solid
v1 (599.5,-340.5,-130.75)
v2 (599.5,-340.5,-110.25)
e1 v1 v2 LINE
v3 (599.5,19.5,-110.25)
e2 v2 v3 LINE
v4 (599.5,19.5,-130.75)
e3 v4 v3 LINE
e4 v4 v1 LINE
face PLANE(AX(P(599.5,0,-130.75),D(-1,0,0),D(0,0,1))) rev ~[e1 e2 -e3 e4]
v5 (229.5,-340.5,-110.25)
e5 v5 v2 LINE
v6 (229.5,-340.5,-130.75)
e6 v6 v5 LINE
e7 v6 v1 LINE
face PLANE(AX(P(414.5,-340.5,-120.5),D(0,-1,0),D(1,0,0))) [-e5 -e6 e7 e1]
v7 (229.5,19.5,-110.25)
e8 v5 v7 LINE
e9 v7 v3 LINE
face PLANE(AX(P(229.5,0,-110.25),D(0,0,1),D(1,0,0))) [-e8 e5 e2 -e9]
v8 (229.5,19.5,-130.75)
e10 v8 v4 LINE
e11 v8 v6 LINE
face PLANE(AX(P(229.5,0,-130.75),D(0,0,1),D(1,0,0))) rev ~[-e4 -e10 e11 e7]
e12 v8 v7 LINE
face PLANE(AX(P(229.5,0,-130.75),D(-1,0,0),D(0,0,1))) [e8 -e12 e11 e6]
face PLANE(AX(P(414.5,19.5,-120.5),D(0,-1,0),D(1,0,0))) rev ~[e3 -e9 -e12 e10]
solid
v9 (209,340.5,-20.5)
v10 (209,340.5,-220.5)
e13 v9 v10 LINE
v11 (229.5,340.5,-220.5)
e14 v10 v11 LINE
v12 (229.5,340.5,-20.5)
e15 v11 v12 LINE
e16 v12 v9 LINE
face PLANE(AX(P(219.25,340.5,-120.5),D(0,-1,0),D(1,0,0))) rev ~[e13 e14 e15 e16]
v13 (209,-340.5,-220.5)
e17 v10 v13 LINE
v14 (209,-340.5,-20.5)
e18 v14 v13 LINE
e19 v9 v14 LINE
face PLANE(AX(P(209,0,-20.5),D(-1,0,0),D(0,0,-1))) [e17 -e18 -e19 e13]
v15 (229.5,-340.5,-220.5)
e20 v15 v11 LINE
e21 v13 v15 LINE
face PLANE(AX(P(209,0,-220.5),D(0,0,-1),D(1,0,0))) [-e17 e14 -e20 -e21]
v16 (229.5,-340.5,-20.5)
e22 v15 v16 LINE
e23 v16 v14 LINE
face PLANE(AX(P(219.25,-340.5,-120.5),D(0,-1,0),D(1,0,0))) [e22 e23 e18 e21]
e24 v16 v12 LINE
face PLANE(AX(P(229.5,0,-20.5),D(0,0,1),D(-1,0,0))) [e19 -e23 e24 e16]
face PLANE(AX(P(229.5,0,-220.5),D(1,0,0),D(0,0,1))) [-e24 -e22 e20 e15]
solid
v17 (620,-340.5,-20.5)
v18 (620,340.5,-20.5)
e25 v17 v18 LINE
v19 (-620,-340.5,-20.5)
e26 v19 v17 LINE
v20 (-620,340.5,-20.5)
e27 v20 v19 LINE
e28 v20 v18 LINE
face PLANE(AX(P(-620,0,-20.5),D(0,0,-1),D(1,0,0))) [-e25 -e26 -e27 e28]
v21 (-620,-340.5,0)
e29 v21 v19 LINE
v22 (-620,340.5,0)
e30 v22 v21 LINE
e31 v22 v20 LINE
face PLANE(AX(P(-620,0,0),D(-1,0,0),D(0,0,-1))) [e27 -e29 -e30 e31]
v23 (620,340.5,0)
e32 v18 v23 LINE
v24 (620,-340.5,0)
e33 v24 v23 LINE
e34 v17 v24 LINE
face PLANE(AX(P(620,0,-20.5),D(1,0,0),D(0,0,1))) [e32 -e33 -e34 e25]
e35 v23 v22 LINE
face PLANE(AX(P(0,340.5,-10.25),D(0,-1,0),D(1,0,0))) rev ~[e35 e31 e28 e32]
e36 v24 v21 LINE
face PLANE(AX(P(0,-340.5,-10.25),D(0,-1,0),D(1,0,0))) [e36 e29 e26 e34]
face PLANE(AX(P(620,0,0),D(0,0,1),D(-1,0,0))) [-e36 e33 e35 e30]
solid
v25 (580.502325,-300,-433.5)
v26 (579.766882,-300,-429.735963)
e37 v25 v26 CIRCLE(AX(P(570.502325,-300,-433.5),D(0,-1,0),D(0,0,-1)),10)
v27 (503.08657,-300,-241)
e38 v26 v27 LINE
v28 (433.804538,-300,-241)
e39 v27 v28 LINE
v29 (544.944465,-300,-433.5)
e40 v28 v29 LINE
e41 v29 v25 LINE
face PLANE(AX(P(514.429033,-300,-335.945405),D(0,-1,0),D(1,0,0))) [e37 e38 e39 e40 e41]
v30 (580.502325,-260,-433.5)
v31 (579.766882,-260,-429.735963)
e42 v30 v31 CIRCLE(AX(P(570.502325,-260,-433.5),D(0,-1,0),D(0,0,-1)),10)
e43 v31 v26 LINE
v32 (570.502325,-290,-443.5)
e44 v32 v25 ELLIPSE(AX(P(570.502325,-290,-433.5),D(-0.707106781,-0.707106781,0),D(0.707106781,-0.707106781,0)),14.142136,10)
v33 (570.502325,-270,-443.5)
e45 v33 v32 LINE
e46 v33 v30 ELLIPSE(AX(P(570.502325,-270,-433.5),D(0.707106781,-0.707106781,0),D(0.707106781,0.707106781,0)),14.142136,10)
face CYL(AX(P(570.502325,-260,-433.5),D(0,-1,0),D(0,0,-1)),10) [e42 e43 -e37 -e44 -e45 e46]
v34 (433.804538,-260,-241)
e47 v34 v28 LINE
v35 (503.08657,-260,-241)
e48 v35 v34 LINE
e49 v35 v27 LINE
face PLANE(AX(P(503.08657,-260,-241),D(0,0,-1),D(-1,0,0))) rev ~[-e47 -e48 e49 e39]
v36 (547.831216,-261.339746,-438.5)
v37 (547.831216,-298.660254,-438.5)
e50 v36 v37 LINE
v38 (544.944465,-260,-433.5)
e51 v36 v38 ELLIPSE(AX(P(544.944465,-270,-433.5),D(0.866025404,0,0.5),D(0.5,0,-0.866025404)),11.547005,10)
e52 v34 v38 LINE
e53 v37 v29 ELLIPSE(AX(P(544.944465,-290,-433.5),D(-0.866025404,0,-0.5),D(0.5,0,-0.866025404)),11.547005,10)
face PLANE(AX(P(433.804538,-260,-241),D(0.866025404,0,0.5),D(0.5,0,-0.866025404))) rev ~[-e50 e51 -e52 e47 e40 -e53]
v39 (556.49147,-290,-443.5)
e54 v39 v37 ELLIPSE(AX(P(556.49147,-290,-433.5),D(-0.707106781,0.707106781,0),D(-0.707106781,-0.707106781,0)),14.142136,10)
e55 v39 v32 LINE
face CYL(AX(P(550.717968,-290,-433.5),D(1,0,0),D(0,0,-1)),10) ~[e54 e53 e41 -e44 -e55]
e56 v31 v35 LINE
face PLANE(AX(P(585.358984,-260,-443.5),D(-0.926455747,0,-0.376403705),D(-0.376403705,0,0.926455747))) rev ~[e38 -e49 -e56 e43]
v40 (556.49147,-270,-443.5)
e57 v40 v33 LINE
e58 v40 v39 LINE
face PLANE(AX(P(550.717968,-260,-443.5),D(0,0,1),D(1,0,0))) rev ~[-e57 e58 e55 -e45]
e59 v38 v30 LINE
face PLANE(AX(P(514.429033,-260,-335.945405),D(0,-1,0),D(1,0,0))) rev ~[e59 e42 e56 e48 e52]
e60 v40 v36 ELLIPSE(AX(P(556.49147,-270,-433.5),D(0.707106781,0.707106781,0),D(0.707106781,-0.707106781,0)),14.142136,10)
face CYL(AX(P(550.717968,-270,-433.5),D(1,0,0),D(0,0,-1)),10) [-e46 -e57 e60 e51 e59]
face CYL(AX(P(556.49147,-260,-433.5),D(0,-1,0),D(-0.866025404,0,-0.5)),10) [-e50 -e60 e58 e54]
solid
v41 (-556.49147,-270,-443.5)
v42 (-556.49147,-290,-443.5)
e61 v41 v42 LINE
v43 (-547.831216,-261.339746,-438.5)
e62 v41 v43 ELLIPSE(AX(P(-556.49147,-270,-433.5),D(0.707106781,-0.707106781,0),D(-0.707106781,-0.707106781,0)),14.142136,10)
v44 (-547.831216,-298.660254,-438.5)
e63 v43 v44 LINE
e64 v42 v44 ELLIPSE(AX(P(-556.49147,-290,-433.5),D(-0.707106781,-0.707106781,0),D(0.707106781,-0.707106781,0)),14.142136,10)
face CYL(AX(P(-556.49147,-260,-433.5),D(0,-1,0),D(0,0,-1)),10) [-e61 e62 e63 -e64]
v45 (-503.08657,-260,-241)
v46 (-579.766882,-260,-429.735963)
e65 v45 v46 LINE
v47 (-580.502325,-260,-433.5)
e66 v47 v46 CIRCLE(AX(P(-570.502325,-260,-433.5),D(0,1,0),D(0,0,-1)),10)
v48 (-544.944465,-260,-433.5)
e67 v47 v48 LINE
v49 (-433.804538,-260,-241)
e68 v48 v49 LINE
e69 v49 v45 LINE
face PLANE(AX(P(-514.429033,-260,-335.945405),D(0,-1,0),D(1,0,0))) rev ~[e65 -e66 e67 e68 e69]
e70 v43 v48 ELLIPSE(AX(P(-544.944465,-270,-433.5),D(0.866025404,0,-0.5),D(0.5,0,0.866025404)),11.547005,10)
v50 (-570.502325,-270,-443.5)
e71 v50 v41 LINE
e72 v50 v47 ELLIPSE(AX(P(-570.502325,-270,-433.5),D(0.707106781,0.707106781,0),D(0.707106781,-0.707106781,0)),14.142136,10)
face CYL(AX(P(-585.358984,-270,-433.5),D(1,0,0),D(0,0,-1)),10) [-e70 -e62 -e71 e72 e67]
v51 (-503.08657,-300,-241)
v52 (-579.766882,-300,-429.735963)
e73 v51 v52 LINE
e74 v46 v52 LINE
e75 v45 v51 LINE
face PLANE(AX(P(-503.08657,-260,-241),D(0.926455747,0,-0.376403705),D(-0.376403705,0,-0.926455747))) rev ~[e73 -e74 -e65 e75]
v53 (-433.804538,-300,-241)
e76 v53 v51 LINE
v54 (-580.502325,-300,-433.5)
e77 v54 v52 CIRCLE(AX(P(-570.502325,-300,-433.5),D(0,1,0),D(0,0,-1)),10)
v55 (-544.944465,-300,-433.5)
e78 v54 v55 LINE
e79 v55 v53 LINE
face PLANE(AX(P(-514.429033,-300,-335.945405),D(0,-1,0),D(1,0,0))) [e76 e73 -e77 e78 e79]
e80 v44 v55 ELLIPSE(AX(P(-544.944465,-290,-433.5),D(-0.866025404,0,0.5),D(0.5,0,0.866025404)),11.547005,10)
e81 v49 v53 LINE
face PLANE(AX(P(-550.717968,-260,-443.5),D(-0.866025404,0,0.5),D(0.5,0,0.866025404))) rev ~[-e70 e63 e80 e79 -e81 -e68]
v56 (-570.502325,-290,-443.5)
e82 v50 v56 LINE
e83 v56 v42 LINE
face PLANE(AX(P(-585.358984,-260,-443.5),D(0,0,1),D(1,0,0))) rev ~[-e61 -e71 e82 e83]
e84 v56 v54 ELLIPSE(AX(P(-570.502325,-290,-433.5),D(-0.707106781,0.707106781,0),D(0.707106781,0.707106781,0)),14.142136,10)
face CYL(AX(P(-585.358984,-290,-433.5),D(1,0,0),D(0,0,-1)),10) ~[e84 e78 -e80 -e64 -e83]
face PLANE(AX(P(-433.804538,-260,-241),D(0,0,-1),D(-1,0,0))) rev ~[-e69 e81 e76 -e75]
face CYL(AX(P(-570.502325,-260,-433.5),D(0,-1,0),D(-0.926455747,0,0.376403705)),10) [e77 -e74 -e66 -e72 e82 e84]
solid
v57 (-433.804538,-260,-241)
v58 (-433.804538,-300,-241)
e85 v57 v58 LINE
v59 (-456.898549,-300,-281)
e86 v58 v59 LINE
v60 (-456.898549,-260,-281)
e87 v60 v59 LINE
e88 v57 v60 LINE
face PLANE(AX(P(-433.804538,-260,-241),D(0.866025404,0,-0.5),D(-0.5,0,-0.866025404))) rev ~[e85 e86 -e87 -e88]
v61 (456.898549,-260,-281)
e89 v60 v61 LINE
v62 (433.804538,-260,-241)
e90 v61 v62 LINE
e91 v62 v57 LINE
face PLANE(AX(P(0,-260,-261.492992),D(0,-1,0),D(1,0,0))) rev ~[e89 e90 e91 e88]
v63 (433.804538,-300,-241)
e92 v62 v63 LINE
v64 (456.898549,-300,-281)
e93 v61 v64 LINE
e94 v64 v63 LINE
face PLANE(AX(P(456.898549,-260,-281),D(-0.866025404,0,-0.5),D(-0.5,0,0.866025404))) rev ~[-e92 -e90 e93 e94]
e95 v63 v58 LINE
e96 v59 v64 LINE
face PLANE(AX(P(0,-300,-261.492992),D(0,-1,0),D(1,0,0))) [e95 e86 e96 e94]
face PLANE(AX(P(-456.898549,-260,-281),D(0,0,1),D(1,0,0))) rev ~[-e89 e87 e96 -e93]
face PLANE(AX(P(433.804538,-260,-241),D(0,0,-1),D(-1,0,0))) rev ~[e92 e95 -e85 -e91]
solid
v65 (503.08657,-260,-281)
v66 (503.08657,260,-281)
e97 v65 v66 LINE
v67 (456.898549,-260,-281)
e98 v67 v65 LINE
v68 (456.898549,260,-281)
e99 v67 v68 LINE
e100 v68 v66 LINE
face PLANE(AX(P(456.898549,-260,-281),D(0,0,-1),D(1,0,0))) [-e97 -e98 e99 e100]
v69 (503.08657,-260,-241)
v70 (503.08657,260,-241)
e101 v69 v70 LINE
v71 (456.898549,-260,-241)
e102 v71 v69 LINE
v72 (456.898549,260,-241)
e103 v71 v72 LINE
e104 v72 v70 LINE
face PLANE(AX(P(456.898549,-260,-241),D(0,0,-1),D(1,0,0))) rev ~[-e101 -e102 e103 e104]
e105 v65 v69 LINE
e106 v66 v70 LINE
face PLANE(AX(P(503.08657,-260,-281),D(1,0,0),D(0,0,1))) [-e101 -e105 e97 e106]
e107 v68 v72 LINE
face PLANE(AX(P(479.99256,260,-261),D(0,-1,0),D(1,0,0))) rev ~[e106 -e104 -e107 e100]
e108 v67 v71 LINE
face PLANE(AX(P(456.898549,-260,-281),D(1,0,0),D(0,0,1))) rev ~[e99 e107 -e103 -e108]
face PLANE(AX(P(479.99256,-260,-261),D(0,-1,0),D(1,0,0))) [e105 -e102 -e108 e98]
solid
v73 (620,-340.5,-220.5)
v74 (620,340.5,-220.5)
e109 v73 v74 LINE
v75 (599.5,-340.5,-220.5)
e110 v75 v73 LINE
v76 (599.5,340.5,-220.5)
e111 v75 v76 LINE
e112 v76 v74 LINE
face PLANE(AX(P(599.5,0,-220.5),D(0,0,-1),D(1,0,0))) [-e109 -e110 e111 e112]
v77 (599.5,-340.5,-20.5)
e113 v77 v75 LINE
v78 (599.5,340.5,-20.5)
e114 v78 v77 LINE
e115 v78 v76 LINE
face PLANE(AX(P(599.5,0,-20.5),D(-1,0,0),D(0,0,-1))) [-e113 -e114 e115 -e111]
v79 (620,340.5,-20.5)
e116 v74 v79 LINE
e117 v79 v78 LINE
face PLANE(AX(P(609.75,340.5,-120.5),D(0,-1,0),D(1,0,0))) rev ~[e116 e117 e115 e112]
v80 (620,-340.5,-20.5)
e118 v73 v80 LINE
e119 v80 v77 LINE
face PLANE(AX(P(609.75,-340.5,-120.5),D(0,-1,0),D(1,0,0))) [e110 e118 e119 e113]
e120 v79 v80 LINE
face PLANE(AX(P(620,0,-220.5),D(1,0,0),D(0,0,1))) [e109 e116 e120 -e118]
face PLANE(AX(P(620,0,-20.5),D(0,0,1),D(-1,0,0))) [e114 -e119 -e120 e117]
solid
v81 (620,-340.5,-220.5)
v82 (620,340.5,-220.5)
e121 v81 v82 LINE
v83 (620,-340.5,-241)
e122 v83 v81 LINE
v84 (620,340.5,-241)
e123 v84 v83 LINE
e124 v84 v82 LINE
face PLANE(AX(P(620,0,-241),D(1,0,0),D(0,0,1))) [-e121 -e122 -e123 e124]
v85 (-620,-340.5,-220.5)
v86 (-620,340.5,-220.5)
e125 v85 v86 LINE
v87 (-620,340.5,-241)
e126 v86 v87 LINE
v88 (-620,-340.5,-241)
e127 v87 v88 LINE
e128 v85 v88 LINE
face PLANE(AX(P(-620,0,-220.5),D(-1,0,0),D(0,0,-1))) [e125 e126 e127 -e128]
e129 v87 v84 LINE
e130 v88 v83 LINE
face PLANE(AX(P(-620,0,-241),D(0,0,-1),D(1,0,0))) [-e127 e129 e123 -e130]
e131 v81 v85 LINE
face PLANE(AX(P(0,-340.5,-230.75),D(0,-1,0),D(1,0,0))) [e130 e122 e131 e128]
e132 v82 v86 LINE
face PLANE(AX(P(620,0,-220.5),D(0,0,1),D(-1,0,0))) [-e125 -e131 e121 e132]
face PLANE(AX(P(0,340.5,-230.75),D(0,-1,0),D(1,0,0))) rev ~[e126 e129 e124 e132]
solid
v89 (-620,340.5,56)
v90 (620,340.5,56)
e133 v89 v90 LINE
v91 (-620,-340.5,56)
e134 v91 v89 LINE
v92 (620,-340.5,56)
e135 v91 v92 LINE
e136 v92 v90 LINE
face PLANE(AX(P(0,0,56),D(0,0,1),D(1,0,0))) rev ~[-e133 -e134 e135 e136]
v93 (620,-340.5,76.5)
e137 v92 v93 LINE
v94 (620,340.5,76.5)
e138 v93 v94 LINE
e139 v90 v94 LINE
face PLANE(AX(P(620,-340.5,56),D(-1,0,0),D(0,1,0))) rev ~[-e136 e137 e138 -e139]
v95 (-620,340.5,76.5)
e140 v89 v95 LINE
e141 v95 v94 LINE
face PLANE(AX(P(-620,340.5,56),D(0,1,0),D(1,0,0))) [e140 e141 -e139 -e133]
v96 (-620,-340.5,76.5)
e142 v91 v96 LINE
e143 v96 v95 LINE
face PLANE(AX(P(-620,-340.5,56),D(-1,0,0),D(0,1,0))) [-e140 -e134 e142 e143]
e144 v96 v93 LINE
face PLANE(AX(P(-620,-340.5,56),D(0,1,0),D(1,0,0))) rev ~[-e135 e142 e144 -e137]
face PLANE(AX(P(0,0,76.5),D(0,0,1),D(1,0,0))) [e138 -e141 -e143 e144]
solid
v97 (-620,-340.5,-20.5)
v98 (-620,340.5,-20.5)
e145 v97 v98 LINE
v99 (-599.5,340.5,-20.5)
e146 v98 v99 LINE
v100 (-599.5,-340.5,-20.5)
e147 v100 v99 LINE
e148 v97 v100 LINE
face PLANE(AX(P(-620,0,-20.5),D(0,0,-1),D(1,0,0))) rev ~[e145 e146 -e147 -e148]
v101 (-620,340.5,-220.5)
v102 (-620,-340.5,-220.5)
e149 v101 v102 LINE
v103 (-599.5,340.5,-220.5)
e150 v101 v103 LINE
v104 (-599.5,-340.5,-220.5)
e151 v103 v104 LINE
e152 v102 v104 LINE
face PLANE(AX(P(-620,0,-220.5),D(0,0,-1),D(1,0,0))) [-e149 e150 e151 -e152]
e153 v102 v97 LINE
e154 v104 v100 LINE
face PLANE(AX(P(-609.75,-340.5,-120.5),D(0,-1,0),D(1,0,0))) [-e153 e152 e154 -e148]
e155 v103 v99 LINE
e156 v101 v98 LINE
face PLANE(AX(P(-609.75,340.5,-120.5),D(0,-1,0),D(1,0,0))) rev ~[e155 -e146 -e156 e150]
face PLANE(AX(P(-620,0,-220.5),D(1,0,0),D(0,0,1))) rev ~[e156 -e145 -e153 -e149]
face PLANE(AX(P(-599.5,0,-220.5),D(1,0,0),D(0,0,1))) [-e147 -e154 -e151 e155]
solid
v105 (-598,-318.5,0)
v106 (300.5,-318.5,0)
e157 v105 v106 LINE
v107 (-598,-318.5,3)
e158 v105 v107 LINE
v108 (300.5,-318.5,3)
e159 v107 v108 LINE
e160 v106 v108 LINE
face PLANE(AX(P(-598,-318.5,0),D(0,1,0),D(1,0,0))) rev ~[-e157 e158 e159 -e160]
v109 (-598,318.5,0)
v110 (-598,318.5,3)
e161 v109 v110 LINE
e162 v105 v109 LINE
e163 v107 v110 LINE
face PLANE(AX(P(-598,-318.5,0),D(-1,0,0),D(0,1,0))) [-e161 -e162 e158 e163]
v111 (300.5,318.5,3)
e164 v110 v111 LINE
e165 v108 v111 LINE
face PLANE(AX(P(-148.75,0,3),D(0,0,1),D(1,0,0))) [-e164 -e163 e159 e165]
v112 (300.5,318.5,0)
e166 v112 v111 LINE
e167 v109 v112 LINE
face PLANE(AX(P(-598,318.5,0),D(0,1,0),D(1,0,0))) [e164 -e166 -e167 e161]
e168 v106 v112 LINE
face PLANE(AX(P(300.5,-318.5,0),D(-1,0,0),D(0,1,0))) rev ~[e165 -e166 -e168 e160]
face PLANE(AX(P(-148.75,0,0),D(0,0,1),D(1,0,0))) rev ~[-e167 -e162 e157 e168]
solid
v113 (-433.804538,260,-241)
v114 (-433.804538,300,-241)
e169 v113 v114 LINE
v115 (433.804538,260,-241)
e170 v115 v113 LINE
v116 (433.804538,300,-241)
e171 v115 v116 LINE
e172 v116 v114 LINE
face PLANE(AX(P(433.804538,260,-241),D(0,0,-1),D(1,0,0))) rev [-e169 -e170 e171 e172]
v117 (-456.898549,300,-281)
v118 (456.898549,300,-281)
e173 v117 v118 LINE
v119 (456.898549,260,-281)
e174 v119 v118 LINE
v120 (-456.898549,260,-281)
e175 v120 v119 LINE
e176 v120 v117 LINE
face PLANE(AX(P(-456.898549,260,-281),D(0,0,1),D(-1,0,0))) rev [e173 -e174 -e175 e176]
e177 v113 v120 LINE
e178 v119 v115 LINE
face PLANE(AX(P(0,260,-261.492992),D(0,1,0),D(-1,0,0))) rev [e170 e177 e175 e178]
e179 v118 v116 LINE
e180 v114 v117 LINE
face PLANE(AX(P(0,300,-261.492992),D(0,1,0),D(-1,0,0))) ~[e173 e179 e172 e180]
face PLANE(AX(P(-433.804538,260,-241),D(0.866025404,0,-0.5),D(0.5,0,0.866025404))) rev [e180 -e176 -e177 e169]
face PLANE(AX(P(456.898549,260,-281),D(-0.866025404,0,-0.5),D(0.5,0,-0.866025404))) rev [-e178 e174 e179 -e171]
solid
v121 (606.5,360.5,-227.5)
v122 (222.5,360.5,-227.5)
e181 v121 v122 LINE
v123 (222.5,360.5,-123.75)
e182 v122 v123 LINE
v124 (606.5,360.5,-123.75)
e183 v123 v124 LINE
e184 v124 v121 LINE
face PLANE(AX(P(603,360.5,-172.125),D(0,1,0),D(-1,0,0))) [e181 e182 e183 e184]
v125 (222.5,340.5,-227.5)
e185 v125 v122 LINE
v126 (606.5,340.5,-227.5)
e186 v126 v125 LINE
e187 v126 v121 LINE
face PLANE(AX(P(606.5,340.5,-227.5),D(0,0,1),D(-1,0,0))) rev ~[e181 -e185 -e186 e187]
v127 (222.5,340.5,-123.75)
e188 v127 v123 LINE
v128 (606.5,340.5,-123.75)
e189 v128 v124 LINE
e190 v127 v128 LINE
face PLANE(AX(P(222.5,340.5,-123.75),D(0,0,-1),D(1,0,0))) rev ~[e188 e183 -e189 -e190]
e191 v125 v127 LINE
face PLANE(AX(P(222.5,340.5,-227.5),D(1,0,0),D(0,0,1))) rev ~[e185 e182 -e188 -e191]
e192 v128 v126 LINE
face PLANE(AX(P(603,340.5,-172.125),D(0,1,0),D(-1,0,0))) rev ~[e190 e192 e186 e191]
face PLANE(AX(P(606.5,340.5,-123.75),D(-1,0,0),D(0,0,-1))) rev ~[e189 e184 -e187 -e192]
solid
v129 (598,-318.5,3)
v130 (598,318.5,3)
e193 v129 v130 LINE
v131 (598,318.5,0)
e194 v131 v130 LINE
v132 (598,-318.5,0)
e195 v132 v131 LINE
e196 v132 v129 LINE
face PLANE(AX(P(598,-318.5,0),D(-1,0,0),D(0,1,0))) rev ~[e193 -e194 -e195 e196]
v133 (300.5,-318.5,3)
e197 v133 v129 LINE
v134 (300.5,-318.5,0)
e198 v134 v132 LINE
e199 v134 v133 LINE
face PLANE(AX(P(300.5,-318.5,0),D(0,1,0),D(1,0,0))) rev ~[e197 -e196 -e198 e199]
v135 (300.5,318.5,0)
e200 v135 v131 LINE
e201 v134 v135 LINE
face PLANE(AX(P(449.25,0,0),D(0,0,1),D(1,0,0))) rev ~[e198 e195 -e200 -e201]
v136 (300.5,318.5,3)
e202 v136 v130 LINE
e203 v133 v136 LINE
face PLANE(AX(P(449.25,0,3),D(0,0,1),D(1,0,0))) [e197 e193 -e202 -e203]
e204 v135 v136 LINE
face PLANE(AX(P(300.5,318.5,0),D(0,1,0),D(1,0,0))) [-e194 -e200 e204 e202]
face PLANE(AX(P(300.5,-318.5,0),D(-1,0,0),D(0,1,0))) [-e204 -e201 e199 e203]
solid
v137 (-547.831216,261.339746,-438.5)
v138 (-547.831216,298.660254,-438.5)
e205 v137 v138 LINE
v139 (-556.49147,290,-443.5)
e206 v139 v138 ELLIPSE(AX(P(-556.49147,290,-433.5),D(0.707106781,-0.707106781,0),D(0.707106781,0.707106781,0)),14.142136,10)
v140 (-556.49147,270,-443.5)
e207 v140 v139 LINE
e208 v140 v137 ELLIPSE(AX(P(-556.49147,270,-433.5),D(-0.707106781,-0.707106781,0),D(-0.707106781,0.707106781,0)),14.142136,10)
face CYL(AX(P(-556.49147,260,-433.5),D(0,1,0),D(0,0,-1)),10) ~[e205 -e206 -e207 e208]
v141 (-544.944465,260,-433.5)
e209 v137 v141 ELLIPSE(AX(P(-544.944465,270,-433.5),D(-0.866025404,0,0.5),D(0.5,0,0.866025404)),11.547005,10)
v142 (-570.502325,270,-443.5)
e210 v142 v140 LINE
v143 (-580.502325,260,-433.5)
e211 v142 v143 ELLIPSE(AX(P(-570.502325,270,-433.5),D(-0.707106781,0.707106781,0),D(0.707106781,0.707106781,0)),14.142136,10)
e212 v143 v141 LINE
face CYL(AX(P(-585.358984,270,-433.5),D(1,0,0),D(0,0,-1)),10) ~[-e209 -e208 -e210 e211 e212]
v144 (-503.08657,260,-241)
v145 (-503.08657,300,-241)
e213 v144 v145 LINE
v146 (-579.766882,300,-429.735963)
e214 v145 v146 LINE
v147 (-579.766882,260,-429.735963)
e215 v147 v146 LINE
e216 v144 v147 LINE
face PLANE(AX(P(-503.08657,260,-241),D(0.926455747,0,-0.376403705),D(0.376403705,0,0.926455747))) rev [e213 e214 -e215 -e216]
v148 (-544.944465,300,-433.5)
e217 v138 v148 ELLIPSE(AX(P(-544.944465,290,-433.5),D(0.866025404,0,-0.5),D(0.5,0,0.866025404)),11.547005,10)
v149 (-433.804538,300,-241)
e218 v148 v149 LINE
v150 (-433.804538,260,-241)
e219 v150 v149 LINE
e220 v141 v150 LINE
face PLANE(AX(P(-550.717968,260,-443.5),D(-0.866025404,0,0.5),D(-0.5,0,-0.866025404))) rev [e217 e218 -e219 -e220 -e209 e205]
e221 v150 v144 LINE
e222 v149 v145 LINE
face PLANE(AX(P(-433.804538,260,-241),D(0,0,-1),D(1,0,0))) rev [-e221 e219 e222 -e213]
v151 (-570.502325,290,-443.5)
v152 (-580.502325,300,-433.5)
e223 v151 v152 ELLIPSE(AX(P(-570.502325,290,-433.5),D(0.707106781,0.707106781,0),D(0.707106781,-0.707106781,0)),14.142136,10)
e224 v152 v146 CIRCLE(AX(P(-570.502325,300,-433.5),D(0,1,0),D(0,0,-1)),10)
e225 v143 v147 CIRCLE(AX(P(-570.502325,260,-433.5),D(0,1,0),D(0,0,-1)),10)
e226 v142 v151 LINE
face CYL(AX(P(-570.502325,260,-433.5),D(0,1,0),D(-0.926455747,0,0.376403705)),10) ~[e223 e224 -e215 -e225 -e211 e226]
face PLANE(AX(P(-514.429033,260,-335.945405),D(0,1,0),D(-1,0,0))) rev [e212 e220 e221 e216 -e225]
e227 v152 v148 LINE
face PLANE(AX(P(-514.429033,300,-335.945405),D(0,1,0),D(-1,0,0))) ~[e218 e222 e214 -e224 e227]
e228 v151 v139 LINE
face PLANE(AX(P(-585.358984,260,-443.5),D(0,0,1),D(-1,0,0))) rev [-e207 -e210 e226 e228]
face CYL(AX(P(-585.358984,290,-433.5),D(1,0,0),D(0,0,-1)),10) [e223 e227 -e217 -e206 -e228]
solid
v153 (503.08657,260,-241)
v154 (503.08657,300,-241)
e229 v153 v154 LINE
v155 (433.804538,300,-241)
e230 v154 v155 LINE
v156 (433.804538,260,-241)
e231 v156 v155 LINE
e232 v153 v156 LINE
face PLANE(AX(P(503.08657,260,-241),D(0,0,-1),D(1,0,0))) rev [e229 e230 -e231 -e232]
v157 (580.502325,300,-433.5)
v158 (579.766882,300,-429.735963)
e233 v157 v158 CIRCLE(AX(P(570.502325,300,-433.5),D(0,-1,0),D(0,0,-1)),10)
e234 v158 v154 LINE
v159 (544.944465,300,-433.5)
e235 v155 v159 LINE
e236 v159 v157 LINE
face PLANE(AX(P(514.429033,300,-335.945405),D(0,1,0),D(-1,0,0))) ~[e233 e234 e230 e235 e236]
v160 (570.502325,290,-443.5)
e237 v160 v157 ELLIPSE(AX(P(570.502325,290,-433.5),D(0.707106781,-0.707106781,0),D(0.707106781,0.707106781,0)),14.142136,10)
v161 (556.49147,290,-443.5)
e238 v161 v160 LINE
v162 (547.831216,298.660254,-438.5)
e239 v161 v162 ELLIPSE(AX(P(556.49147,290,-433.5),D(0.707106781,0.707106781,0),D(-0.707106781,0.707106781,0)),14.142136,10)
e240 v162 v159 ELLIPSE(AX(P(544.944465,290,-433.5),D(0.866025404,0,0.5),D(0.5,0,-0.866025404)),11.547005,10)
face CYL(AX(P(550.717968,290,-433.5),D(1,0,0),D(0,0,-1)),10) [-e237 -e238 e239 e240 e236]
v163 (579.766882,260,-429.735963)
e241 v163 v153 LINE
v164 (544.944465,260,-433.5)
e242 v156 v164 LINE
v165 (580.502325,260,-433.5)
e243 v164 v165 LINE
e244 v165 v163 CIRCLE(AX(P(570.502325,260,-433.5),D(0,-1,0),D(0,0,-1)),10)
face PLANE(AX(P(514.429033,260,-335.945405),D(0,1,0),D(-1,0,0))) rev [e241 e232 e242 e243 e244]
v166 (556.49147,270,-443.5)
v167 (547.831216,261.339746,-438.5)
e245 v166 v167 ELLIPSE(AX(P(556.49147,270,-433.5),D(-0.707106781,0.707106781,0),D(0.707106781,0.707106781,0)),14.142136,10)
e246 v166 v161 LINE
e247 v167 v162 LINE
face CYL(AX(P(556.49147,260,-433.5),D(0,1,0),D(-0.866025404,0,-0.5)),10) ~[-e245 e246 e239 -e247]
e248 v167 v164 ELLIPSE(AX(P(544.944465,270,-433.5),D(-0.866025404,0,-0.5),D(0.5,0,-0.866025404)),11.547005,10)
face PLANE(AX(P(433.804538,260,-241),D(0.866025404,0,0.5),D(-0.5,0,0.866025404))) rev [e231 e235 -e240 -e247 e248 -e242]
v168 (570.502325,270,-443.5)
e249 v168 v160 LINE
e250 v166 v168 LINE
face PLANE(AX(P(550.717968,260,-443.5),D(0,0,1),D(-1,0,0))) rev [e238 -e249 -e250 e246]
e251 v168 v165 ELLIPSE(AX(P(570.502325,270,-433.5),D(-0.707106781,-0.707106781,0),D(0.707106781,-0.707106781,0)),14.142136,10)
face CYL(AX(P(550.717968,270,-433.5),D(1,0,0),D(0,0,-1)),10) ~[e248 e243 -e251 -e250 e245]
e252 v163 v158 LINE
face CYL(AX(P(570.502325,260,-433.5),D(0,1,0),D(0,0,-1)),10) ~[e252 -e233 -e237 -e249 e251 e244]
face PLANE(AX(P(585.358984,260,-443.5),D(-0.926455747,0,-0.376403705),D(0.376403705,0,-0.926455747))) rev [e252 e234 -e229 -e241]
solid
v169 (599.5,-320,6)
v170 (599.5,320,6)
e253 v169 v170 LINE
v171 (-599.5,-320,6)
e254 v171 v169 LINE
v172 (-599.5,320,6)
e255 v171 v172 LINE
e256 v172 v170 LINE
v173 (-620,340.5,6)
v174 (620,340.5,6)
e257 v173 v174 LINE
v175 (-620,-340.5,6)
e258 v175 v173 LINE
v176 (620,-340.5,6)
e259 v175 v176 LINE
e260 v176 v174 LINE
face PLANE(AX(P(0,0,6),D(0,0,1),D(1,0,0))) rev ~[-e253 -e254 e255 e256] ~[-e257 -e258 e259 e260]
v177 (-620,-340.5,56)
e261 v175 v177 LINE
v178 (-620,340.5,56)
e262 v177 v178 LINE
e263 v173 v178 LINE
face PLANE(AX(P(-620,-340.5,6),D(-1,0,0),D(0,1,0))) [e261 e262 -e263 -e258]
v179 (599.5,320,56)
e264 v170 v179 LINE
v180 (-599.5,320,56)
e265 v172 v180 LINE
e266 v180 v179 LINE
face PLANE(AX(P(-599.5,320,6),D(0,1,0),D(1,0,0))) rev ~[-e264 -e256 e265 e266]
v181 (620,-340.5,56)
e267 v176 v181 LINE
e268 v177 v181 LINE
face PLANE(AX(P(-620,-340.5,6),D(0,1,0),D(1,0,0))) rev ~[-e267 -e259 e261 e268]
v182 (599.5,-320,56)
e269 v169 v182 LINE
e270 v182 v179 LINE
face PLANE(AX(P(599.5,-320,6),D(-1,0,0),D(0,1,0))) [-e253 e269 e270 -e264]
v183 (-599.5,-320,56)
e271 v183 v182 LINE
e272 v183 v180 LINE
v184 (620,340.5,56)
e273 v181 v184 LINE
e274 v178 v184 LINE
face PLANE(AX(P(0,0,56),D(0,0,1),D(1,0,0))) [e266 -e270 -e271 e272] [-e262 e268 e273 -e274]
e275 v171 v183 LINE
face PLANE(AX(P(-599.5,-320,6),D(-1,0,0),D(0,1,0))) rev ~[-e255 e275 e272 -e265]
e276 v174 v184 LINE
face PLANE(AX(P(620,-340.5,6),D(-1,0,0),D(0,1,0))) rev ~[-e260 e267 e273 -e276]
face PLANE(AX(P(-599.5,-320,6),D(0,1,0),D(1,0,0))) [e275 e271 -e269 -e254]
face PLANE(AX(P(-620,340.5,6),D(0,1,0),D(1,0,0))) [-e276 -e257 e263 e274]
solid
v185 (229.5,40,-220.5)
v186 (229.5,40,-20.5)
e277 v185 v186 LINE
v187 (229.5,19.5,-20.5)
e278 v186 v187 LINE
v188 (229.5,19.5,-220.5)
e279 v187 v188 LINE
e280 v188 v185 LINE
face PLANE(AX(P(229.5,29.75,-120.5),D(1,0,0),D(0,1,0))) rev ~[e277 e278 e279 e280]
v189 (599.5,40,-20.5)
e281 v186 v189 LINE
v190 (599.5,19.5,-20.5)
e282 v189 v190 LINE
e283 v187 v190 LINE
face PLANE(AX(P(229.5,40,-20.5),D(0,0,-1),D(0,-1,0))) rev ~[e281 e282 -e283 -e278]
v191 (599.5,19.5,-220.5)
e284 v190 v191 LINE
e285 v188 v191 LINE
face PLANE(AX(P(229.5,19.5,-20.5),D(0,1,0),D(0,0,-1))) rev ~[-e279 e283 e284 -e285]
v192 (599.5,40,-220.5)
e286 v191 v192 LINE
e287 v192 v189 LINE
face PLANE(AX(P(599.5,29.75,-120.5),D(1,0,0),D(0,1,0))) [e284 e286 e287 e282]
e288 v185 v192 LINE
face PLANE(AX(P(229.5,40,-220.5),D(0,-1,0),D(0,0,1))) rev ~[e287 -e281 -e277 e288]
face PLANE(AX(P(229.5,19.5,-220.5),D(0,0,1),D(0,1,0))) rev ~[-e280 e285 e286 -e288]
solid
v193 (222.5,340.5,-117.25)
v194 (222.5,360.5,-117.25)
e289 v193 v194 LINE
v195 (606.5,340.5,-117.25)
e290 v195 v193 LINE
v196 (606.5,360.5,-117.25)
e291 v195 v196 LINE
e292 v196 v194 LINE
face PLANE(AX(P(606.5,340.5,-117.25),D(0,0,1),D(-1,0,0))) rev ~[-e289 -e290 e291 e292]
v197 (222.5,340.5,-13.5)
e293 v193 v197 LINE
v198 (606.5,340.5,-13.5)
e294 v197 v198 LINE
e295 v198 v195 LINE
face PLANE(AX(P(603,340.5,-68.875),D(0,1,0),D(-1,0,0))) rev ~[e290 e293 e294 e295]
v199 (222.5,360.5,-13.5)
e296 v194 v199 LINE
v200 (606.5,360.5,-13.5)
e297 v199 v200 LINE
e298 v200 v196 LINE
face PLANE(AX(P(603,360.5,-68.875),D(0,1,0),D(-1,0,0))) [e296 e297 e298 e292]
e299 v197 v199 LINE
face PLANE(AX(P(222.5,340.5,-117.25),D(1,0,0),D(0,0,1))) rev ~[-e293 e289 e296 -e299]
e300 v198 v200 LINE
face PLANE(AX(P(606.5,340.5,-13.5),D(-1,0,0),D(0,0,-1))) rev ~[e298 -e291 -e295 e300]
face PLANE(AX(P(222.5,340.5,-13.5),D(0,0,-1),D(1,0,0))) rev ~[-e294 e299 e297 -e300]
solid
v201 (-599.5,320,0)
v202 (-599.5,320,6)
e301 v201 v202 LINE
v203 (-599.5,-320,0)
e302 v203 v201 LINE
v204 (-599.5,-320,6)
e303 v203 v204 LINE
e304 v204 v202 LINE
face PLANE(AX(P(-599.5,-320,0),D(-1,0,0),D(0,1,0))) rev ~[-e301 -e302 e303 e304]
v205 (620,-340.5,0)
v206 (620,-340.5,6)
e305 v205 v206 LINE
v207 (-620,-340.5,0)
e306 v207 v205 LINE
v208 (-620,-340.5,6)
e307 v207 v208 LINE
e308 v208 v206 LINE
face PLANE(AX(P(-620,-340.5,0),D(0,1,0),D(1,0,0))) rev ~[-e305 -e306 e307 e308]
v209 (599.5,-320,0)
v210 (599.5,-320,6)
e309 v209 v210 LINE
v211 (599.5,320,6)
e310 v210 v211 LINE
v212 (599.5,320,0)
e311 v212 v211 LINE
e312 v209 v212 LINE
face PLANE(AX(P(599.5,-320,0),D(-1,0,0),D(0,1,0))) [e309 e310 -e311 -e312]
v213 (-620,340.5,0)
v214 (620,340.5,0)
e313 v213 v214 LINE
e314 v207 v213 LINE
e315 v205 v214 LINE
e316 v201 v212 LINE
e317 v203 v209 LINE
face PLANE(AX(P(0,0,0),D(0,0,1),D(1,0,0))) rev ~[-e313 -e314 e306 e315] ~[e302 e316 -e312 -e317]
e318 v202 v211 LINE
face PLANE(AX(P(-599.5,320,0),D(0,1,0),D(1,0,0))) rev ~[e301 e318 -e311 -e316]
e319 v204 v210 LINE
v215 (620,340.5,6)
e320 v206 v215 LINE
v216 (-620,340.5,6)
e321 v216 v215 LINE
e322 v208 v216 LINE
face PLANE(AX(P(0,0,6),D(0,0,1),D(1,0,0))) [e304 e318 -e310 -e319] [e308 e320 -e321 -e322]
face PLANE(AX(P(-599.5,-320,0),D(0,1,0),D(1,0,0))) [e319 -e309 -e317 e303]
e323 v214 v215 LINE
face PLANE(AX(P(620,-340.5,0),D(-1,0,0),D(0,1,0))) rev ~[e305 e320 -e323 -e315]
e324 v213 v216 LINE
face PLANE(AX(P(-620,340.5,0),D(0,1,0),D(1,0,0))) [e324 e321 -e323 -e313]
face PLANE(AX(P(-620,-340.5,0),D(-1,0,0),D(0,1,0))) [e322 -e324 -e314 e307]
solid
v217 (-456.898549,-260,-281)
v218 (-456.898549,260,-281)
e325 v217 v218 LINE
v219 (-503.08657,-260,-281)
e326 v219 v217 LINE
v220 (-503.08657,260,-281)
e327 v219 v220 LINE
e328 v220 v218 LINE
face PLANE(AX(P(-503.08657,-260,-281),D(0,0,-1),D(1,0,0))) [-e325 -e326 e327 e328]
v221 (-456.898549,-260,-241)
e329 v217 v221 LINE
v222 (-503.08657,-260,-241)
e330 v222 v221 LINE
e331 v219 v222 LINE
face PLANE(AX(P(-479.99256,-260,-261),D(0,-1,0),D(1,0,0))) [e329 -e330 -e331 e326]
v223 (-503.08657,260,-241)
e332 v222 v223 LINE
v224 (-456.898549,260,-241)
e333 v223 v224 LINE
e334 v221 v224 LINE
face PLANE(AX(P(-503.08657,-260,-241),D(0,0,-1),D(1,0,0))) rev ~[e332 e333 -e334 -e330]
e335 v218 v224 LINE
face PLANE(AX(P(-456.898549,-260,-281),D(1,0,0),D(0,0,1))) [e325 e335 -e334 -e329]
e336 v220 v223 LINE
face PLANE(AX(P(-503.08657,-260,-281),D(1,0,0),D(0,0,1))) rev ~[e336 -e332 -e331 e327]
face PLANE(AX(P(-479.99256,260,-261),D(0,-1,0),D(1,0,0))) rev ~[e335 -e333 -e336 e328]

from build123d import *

# Parameters (mm, degrees)
F1_DEPTH       = 340.5
F1_DEPTH_BACK  = 340.5
F2_DEPTH       = 340.5
F2_DEPTH_BACK  = 340.5
F0_W           = 20.5
F0_H           = 200
F3_DEPTH       = 340.5
F3_DEPTH_BACK  = 340.5
F6_DEPTH       = 40
F7_R           = 10
F7_2_R         = 10
F8_DEPTH       = 40
F10_W          = 46.1880215352
F10_H          = 40
F11_DEPTH      = 520
F12_W          = 7
F12_H          = 96.75
F13_DEPTH      = 20
F14_W          = 1240
F14_H          = 681
F14_W_2        = 1230
F14_H_2        = 671
F14_W_3        = 1199
F14_H_3        = 640
F15_DEPTH      = 6
F16_W          = 898.5
F16_H          = 637
F17_DEPTH      = 3
F16_W_2        = 297.5
F18_DEPTH      = 3
F19_DEPTH      = 50
F20_W          = 1240
F20_H          = 681
F21_DEPTH      = 20.5
F23_DEPTH      = 370
F0_W_2         = 370
F0_H_2         = 20.5
F24_DEPTH      = 19.5
F24_DEPTH_BACK = 340.5


# Not quite as in the source:
# - a feature names something its author has since deleted; it is built from what else it names


with BuildPart() as f1:
    # F0 (on Front) → F1 (new body, two sides)
    with BuildSketch(Plane.XZ) as f1_sk:
        Polygon((-599.5, -220.5), (-620, -220.5), (-620, -241), (620, -241), (620, -220.5), (599.5, -220.5), (229.5, -220.5), (209, -220.5), align=None)
    extrude(amount=F1_DEPTH)
    extrude(f1_sk.sketch, amount=-F1_DEPTH_BACK)


with BuildPart() as f2:
    # F0 (on Front) → F2 (new body, two sides)
    with BuildSketch(Plane.XZ) as f2_sk:
        Polygon((229.5, -20.5), (209, -20.5), (209, -220.5), (229.5, -220.5), (229.5, -130.75), (229.5, -110.25), align=None)
    extrude(amount=F2_DEPTH)
    extrude(f2_sk.sketch, amount=-F2_DEPTH_BACK)


with BuildPart() as f2b:
    # F0 (on Front) → F2, piece 2 (new body, two sides)
    with BuildSketch(Plane.XZ) as f2_2_sk:
        with Locations((-609.75, -120.5)):
            Rectangle(F0_W, F0_H)
    extrude(amount=F2_DEPTH)
    extrude(f2_2_sk.sketch, amount=-F2_DEPTH_BACK)


with BuildPart() as f2c:
    # F0 (on Front) → F2, piece 3 (new body, two sides)
    with BuildSketch(Plane.XZ) as f2_3_sk:
        Polygon((620, -220.5), (620, -20.5), (599.5, -20.5), (599.5, -110.25), (599.5, -130.75), (599.5, -220.5), align=None)
    extrude(amount=F2_DEPTH)
    extrude(f2_3_sk.sketch, amount=-F2_DEPTH_BACK)


with BuildPart() as f3:
    # F0 (on Front) → F3 (new body, two sides)
    with BuildSketch(Plane.XZ) as f3_sk:
        Polygon((620, 0), (-620, 0), (-620, -20.5), (-599.5, -20.5), (209, -20.5), (229.5, -20.5), (599.5, -20.5), (620, -20.5), align=None)
    extrude(amount=F3_DEPTH)
    extrude(f3_sk.sketch, amount=-F3_DEPTH_BACK)


with BuildPart() as f6:
    # F5 (on offset) → F6 (new body)
    with BuildSketch(Plane.XZ.offset(260)):
        Polygon((-433.8045381863, -241), (-503.0865704891, -241), (-585.3589838486, -443.5), (-550.7179676972, -443.5), (-456.8985489539, -281), align=None)
    extrude(amount=F6_DEPTH)

    # F7
    f7_edges = [f6.edges().sort_by_distance(p)[0] for p in [
        (-568.038476, -300, -443.5),
        (-550.717968, -280, -443.5),
        (-568.038476, -260, -443.5),
        (-585.358984, -280, -443.5),
    ]]
    fillet(f7_edges, radius=F7_R)


with BuildPart() as f6b:
    # F5 (on offset) → F6, piece 2 (new body)
    with BuildSketch(Plane.XZ.offset(260)):
        Polygon((503.0865704891, -241), (433.8045381863, -241), (456.8985489539, -281), (550.7179676972, -443.5), (585.3589838486, -443.5), align=None)
    extrude(amount=F6_DEPTH)

    # F7#2
    f7_2_edges = [f6b.edges().sort_by_distance(p)[0] for p in [
        (568.038476, -300, -443.5),
        (550.717968, -280, -443.5),
        (568.038476, -260, -443.5),
        (585.358984, -280, -443.5),
    ]]
    fillet(f7_2_edges, radius=F7_2_R)


with BuildPart() as f8:
    # F5 (on offset) → F8 (new body)
    with BuildSketch(Plane.XZ.offset(260)):
        Polygon((433.8045381863, -241), (-433.8045381863, -241), (-456.8985489539, -281), (456.8985489539, -281), align=None)
    extrude(amount=F8_DEPTH)


with BuildPart() as f9_1:
    # F9: instance of F6
    add(f6.part.mirror(Plane.XZ))


with BuildPart() as f9_2:
    # F9: instance of F6b
    add(f6b.part.mirror(Plane.XZ))


with BuildPart() as f9_3:
    # F9: instance of F8
    add(f8.part.mirror(Plane.XZ))


with BuildPart() as f11:
    # F10 (on face) → F11 (new body, through all)
    with BuildSketch(Plane.XZ.offset(260)):
        with Locations((479.9925597215, -261)):
            Rectangle(F10_W, F10_H)
    extrude(amount=-F11_DEPTH)


with BuildPart() as f11b:
    # F10 (on face) → F11, piece 2 (new body, through all)
    with BuildSketch(Plane.XZ.offset(260)):
        with Locations((-479.9925597215, -261)):
            Rectangle(F10_W, F10_H)
    extrude(amount=-F11_DEPTH)


with BuildPart() as f13:
    # F12 (on face) → F13 (new body)
    with BuildSketch(Plane(origin=(0, 340.5, 0), x_dir=(-1, 0, 0), z_dir=(0, 1, 0))):
        with Locations((-603, -68.875)):
            Rectangle(F12_W, F12_H)
        Polygon((-222.5, -117.25), (-222.5, -13.5), (-606.5, -13.5), (-606.5, -20.5), (-599.5, -20.5), (-599.5, -117.25), align=None)
    extrude(amount=F13_DEPTH)


with BuildPart() as f13b:
    # F12 (on face) → F13, piece 2 (new body)
    with BuildSketch(Plane(origin=(0, 340.5, 0), x_dir=(-1, 0, 0), z_dir=(0, 1, 0))):
        with Locations((-603, -172.125)):
            Rectangle(F12_W, F12_H)
        Polygon((-222.5, -123.75), (-599.5, -123.75), (-599.5, -220.5), (-606.5, -220.5), (-606.5, -227.5), (-222.5, -227.5), align=None)
    extrude(amount=F13_DEPTH)


with BuildPart() as f15:
    # F14 (on face) → F15 (new body)
    with BuildSketch(Plane.XY):
        Rectangle(F14_W, F14_H)
        Rectangle(F14_W_2, F14_H_2, mode=Mode.SUBTRACT)
        Rectangle(F14_W_2, F14_H_2)
        Rectangle(F14_W_3, F14_H_3, mode=Mode.SUBTRACT)
    extrude(amount=F15_DEPTH)


with BuildPart() as f17:
    # F16 (on face) → F17 (new body)
    with BuildSketch(Plane.XY):
        with Locations((-148.75, 0)):
            Rectangle(F16_W, F16_H)
    extrude(amount=F17_DEPTH)


with BuildPart() as f18:
    # F16 (on face) → F18 (new body, through all)
    with BuildSketch(Plane.XY):
        with Locations((449.25, 0)):
            Rectangle(F16_W_2, F16_H)
    extrude(amount=F18_DEPTH)


with BuildPart() as f19:
    # F19 (new): a face of the model
    f19_faces = [f15.part.faces().sort_by_distance(p)[0] for p in [
        (-613.646946667, 0, 6),
    ]]
    extrude(f19_faces, amount=F19_DEPTH)


with BuildPart() as f21:
    # F20 (on face) → F21 (new body)
    with BuildSketch(Plane.XY.offset(56)):
        Rectangle(F20_W, F20_H)
    extrude(amount=F21_DEPTH)


with BuildPart() as f23:
    # F22 (on face) → F23 (new body, through all)
    with BuildSketch(Plane.YZ.offset(229.5)):
        Polygon((40, -20.5), (19.5, -20.5), (19.5, -130.75), (19.5, -220.5), (40, -220.5), (40, -130.75), align=None)
    extrude(amount=F23_DEPTH)


with BuildPart() as f24:
    # F0 (on Front) → F24 (new body, two sides)
    with BuildSketch(Plane.XZ) as f24_sk:
        with Locations((414.5, -120.5)):
            Rectangle(F0_W_2, F0_H_2)
    extrude(amount=-F24_DEPTH)
    extrude(f24_sk.sketch, amount=F24_DEPTH_BACK)


solid = Compound([f1.part, f2.part, f2b.part, f2c.part, f3.part, f6.part, f6b.part, f8.part, f9_1.part, f9_2.part, f9_3.part, f11.part, f11b.part, f13.part, f13b.part, f15.part, f17.part, f18.part, f19.part, f21.part, f23.part, f24.part])
